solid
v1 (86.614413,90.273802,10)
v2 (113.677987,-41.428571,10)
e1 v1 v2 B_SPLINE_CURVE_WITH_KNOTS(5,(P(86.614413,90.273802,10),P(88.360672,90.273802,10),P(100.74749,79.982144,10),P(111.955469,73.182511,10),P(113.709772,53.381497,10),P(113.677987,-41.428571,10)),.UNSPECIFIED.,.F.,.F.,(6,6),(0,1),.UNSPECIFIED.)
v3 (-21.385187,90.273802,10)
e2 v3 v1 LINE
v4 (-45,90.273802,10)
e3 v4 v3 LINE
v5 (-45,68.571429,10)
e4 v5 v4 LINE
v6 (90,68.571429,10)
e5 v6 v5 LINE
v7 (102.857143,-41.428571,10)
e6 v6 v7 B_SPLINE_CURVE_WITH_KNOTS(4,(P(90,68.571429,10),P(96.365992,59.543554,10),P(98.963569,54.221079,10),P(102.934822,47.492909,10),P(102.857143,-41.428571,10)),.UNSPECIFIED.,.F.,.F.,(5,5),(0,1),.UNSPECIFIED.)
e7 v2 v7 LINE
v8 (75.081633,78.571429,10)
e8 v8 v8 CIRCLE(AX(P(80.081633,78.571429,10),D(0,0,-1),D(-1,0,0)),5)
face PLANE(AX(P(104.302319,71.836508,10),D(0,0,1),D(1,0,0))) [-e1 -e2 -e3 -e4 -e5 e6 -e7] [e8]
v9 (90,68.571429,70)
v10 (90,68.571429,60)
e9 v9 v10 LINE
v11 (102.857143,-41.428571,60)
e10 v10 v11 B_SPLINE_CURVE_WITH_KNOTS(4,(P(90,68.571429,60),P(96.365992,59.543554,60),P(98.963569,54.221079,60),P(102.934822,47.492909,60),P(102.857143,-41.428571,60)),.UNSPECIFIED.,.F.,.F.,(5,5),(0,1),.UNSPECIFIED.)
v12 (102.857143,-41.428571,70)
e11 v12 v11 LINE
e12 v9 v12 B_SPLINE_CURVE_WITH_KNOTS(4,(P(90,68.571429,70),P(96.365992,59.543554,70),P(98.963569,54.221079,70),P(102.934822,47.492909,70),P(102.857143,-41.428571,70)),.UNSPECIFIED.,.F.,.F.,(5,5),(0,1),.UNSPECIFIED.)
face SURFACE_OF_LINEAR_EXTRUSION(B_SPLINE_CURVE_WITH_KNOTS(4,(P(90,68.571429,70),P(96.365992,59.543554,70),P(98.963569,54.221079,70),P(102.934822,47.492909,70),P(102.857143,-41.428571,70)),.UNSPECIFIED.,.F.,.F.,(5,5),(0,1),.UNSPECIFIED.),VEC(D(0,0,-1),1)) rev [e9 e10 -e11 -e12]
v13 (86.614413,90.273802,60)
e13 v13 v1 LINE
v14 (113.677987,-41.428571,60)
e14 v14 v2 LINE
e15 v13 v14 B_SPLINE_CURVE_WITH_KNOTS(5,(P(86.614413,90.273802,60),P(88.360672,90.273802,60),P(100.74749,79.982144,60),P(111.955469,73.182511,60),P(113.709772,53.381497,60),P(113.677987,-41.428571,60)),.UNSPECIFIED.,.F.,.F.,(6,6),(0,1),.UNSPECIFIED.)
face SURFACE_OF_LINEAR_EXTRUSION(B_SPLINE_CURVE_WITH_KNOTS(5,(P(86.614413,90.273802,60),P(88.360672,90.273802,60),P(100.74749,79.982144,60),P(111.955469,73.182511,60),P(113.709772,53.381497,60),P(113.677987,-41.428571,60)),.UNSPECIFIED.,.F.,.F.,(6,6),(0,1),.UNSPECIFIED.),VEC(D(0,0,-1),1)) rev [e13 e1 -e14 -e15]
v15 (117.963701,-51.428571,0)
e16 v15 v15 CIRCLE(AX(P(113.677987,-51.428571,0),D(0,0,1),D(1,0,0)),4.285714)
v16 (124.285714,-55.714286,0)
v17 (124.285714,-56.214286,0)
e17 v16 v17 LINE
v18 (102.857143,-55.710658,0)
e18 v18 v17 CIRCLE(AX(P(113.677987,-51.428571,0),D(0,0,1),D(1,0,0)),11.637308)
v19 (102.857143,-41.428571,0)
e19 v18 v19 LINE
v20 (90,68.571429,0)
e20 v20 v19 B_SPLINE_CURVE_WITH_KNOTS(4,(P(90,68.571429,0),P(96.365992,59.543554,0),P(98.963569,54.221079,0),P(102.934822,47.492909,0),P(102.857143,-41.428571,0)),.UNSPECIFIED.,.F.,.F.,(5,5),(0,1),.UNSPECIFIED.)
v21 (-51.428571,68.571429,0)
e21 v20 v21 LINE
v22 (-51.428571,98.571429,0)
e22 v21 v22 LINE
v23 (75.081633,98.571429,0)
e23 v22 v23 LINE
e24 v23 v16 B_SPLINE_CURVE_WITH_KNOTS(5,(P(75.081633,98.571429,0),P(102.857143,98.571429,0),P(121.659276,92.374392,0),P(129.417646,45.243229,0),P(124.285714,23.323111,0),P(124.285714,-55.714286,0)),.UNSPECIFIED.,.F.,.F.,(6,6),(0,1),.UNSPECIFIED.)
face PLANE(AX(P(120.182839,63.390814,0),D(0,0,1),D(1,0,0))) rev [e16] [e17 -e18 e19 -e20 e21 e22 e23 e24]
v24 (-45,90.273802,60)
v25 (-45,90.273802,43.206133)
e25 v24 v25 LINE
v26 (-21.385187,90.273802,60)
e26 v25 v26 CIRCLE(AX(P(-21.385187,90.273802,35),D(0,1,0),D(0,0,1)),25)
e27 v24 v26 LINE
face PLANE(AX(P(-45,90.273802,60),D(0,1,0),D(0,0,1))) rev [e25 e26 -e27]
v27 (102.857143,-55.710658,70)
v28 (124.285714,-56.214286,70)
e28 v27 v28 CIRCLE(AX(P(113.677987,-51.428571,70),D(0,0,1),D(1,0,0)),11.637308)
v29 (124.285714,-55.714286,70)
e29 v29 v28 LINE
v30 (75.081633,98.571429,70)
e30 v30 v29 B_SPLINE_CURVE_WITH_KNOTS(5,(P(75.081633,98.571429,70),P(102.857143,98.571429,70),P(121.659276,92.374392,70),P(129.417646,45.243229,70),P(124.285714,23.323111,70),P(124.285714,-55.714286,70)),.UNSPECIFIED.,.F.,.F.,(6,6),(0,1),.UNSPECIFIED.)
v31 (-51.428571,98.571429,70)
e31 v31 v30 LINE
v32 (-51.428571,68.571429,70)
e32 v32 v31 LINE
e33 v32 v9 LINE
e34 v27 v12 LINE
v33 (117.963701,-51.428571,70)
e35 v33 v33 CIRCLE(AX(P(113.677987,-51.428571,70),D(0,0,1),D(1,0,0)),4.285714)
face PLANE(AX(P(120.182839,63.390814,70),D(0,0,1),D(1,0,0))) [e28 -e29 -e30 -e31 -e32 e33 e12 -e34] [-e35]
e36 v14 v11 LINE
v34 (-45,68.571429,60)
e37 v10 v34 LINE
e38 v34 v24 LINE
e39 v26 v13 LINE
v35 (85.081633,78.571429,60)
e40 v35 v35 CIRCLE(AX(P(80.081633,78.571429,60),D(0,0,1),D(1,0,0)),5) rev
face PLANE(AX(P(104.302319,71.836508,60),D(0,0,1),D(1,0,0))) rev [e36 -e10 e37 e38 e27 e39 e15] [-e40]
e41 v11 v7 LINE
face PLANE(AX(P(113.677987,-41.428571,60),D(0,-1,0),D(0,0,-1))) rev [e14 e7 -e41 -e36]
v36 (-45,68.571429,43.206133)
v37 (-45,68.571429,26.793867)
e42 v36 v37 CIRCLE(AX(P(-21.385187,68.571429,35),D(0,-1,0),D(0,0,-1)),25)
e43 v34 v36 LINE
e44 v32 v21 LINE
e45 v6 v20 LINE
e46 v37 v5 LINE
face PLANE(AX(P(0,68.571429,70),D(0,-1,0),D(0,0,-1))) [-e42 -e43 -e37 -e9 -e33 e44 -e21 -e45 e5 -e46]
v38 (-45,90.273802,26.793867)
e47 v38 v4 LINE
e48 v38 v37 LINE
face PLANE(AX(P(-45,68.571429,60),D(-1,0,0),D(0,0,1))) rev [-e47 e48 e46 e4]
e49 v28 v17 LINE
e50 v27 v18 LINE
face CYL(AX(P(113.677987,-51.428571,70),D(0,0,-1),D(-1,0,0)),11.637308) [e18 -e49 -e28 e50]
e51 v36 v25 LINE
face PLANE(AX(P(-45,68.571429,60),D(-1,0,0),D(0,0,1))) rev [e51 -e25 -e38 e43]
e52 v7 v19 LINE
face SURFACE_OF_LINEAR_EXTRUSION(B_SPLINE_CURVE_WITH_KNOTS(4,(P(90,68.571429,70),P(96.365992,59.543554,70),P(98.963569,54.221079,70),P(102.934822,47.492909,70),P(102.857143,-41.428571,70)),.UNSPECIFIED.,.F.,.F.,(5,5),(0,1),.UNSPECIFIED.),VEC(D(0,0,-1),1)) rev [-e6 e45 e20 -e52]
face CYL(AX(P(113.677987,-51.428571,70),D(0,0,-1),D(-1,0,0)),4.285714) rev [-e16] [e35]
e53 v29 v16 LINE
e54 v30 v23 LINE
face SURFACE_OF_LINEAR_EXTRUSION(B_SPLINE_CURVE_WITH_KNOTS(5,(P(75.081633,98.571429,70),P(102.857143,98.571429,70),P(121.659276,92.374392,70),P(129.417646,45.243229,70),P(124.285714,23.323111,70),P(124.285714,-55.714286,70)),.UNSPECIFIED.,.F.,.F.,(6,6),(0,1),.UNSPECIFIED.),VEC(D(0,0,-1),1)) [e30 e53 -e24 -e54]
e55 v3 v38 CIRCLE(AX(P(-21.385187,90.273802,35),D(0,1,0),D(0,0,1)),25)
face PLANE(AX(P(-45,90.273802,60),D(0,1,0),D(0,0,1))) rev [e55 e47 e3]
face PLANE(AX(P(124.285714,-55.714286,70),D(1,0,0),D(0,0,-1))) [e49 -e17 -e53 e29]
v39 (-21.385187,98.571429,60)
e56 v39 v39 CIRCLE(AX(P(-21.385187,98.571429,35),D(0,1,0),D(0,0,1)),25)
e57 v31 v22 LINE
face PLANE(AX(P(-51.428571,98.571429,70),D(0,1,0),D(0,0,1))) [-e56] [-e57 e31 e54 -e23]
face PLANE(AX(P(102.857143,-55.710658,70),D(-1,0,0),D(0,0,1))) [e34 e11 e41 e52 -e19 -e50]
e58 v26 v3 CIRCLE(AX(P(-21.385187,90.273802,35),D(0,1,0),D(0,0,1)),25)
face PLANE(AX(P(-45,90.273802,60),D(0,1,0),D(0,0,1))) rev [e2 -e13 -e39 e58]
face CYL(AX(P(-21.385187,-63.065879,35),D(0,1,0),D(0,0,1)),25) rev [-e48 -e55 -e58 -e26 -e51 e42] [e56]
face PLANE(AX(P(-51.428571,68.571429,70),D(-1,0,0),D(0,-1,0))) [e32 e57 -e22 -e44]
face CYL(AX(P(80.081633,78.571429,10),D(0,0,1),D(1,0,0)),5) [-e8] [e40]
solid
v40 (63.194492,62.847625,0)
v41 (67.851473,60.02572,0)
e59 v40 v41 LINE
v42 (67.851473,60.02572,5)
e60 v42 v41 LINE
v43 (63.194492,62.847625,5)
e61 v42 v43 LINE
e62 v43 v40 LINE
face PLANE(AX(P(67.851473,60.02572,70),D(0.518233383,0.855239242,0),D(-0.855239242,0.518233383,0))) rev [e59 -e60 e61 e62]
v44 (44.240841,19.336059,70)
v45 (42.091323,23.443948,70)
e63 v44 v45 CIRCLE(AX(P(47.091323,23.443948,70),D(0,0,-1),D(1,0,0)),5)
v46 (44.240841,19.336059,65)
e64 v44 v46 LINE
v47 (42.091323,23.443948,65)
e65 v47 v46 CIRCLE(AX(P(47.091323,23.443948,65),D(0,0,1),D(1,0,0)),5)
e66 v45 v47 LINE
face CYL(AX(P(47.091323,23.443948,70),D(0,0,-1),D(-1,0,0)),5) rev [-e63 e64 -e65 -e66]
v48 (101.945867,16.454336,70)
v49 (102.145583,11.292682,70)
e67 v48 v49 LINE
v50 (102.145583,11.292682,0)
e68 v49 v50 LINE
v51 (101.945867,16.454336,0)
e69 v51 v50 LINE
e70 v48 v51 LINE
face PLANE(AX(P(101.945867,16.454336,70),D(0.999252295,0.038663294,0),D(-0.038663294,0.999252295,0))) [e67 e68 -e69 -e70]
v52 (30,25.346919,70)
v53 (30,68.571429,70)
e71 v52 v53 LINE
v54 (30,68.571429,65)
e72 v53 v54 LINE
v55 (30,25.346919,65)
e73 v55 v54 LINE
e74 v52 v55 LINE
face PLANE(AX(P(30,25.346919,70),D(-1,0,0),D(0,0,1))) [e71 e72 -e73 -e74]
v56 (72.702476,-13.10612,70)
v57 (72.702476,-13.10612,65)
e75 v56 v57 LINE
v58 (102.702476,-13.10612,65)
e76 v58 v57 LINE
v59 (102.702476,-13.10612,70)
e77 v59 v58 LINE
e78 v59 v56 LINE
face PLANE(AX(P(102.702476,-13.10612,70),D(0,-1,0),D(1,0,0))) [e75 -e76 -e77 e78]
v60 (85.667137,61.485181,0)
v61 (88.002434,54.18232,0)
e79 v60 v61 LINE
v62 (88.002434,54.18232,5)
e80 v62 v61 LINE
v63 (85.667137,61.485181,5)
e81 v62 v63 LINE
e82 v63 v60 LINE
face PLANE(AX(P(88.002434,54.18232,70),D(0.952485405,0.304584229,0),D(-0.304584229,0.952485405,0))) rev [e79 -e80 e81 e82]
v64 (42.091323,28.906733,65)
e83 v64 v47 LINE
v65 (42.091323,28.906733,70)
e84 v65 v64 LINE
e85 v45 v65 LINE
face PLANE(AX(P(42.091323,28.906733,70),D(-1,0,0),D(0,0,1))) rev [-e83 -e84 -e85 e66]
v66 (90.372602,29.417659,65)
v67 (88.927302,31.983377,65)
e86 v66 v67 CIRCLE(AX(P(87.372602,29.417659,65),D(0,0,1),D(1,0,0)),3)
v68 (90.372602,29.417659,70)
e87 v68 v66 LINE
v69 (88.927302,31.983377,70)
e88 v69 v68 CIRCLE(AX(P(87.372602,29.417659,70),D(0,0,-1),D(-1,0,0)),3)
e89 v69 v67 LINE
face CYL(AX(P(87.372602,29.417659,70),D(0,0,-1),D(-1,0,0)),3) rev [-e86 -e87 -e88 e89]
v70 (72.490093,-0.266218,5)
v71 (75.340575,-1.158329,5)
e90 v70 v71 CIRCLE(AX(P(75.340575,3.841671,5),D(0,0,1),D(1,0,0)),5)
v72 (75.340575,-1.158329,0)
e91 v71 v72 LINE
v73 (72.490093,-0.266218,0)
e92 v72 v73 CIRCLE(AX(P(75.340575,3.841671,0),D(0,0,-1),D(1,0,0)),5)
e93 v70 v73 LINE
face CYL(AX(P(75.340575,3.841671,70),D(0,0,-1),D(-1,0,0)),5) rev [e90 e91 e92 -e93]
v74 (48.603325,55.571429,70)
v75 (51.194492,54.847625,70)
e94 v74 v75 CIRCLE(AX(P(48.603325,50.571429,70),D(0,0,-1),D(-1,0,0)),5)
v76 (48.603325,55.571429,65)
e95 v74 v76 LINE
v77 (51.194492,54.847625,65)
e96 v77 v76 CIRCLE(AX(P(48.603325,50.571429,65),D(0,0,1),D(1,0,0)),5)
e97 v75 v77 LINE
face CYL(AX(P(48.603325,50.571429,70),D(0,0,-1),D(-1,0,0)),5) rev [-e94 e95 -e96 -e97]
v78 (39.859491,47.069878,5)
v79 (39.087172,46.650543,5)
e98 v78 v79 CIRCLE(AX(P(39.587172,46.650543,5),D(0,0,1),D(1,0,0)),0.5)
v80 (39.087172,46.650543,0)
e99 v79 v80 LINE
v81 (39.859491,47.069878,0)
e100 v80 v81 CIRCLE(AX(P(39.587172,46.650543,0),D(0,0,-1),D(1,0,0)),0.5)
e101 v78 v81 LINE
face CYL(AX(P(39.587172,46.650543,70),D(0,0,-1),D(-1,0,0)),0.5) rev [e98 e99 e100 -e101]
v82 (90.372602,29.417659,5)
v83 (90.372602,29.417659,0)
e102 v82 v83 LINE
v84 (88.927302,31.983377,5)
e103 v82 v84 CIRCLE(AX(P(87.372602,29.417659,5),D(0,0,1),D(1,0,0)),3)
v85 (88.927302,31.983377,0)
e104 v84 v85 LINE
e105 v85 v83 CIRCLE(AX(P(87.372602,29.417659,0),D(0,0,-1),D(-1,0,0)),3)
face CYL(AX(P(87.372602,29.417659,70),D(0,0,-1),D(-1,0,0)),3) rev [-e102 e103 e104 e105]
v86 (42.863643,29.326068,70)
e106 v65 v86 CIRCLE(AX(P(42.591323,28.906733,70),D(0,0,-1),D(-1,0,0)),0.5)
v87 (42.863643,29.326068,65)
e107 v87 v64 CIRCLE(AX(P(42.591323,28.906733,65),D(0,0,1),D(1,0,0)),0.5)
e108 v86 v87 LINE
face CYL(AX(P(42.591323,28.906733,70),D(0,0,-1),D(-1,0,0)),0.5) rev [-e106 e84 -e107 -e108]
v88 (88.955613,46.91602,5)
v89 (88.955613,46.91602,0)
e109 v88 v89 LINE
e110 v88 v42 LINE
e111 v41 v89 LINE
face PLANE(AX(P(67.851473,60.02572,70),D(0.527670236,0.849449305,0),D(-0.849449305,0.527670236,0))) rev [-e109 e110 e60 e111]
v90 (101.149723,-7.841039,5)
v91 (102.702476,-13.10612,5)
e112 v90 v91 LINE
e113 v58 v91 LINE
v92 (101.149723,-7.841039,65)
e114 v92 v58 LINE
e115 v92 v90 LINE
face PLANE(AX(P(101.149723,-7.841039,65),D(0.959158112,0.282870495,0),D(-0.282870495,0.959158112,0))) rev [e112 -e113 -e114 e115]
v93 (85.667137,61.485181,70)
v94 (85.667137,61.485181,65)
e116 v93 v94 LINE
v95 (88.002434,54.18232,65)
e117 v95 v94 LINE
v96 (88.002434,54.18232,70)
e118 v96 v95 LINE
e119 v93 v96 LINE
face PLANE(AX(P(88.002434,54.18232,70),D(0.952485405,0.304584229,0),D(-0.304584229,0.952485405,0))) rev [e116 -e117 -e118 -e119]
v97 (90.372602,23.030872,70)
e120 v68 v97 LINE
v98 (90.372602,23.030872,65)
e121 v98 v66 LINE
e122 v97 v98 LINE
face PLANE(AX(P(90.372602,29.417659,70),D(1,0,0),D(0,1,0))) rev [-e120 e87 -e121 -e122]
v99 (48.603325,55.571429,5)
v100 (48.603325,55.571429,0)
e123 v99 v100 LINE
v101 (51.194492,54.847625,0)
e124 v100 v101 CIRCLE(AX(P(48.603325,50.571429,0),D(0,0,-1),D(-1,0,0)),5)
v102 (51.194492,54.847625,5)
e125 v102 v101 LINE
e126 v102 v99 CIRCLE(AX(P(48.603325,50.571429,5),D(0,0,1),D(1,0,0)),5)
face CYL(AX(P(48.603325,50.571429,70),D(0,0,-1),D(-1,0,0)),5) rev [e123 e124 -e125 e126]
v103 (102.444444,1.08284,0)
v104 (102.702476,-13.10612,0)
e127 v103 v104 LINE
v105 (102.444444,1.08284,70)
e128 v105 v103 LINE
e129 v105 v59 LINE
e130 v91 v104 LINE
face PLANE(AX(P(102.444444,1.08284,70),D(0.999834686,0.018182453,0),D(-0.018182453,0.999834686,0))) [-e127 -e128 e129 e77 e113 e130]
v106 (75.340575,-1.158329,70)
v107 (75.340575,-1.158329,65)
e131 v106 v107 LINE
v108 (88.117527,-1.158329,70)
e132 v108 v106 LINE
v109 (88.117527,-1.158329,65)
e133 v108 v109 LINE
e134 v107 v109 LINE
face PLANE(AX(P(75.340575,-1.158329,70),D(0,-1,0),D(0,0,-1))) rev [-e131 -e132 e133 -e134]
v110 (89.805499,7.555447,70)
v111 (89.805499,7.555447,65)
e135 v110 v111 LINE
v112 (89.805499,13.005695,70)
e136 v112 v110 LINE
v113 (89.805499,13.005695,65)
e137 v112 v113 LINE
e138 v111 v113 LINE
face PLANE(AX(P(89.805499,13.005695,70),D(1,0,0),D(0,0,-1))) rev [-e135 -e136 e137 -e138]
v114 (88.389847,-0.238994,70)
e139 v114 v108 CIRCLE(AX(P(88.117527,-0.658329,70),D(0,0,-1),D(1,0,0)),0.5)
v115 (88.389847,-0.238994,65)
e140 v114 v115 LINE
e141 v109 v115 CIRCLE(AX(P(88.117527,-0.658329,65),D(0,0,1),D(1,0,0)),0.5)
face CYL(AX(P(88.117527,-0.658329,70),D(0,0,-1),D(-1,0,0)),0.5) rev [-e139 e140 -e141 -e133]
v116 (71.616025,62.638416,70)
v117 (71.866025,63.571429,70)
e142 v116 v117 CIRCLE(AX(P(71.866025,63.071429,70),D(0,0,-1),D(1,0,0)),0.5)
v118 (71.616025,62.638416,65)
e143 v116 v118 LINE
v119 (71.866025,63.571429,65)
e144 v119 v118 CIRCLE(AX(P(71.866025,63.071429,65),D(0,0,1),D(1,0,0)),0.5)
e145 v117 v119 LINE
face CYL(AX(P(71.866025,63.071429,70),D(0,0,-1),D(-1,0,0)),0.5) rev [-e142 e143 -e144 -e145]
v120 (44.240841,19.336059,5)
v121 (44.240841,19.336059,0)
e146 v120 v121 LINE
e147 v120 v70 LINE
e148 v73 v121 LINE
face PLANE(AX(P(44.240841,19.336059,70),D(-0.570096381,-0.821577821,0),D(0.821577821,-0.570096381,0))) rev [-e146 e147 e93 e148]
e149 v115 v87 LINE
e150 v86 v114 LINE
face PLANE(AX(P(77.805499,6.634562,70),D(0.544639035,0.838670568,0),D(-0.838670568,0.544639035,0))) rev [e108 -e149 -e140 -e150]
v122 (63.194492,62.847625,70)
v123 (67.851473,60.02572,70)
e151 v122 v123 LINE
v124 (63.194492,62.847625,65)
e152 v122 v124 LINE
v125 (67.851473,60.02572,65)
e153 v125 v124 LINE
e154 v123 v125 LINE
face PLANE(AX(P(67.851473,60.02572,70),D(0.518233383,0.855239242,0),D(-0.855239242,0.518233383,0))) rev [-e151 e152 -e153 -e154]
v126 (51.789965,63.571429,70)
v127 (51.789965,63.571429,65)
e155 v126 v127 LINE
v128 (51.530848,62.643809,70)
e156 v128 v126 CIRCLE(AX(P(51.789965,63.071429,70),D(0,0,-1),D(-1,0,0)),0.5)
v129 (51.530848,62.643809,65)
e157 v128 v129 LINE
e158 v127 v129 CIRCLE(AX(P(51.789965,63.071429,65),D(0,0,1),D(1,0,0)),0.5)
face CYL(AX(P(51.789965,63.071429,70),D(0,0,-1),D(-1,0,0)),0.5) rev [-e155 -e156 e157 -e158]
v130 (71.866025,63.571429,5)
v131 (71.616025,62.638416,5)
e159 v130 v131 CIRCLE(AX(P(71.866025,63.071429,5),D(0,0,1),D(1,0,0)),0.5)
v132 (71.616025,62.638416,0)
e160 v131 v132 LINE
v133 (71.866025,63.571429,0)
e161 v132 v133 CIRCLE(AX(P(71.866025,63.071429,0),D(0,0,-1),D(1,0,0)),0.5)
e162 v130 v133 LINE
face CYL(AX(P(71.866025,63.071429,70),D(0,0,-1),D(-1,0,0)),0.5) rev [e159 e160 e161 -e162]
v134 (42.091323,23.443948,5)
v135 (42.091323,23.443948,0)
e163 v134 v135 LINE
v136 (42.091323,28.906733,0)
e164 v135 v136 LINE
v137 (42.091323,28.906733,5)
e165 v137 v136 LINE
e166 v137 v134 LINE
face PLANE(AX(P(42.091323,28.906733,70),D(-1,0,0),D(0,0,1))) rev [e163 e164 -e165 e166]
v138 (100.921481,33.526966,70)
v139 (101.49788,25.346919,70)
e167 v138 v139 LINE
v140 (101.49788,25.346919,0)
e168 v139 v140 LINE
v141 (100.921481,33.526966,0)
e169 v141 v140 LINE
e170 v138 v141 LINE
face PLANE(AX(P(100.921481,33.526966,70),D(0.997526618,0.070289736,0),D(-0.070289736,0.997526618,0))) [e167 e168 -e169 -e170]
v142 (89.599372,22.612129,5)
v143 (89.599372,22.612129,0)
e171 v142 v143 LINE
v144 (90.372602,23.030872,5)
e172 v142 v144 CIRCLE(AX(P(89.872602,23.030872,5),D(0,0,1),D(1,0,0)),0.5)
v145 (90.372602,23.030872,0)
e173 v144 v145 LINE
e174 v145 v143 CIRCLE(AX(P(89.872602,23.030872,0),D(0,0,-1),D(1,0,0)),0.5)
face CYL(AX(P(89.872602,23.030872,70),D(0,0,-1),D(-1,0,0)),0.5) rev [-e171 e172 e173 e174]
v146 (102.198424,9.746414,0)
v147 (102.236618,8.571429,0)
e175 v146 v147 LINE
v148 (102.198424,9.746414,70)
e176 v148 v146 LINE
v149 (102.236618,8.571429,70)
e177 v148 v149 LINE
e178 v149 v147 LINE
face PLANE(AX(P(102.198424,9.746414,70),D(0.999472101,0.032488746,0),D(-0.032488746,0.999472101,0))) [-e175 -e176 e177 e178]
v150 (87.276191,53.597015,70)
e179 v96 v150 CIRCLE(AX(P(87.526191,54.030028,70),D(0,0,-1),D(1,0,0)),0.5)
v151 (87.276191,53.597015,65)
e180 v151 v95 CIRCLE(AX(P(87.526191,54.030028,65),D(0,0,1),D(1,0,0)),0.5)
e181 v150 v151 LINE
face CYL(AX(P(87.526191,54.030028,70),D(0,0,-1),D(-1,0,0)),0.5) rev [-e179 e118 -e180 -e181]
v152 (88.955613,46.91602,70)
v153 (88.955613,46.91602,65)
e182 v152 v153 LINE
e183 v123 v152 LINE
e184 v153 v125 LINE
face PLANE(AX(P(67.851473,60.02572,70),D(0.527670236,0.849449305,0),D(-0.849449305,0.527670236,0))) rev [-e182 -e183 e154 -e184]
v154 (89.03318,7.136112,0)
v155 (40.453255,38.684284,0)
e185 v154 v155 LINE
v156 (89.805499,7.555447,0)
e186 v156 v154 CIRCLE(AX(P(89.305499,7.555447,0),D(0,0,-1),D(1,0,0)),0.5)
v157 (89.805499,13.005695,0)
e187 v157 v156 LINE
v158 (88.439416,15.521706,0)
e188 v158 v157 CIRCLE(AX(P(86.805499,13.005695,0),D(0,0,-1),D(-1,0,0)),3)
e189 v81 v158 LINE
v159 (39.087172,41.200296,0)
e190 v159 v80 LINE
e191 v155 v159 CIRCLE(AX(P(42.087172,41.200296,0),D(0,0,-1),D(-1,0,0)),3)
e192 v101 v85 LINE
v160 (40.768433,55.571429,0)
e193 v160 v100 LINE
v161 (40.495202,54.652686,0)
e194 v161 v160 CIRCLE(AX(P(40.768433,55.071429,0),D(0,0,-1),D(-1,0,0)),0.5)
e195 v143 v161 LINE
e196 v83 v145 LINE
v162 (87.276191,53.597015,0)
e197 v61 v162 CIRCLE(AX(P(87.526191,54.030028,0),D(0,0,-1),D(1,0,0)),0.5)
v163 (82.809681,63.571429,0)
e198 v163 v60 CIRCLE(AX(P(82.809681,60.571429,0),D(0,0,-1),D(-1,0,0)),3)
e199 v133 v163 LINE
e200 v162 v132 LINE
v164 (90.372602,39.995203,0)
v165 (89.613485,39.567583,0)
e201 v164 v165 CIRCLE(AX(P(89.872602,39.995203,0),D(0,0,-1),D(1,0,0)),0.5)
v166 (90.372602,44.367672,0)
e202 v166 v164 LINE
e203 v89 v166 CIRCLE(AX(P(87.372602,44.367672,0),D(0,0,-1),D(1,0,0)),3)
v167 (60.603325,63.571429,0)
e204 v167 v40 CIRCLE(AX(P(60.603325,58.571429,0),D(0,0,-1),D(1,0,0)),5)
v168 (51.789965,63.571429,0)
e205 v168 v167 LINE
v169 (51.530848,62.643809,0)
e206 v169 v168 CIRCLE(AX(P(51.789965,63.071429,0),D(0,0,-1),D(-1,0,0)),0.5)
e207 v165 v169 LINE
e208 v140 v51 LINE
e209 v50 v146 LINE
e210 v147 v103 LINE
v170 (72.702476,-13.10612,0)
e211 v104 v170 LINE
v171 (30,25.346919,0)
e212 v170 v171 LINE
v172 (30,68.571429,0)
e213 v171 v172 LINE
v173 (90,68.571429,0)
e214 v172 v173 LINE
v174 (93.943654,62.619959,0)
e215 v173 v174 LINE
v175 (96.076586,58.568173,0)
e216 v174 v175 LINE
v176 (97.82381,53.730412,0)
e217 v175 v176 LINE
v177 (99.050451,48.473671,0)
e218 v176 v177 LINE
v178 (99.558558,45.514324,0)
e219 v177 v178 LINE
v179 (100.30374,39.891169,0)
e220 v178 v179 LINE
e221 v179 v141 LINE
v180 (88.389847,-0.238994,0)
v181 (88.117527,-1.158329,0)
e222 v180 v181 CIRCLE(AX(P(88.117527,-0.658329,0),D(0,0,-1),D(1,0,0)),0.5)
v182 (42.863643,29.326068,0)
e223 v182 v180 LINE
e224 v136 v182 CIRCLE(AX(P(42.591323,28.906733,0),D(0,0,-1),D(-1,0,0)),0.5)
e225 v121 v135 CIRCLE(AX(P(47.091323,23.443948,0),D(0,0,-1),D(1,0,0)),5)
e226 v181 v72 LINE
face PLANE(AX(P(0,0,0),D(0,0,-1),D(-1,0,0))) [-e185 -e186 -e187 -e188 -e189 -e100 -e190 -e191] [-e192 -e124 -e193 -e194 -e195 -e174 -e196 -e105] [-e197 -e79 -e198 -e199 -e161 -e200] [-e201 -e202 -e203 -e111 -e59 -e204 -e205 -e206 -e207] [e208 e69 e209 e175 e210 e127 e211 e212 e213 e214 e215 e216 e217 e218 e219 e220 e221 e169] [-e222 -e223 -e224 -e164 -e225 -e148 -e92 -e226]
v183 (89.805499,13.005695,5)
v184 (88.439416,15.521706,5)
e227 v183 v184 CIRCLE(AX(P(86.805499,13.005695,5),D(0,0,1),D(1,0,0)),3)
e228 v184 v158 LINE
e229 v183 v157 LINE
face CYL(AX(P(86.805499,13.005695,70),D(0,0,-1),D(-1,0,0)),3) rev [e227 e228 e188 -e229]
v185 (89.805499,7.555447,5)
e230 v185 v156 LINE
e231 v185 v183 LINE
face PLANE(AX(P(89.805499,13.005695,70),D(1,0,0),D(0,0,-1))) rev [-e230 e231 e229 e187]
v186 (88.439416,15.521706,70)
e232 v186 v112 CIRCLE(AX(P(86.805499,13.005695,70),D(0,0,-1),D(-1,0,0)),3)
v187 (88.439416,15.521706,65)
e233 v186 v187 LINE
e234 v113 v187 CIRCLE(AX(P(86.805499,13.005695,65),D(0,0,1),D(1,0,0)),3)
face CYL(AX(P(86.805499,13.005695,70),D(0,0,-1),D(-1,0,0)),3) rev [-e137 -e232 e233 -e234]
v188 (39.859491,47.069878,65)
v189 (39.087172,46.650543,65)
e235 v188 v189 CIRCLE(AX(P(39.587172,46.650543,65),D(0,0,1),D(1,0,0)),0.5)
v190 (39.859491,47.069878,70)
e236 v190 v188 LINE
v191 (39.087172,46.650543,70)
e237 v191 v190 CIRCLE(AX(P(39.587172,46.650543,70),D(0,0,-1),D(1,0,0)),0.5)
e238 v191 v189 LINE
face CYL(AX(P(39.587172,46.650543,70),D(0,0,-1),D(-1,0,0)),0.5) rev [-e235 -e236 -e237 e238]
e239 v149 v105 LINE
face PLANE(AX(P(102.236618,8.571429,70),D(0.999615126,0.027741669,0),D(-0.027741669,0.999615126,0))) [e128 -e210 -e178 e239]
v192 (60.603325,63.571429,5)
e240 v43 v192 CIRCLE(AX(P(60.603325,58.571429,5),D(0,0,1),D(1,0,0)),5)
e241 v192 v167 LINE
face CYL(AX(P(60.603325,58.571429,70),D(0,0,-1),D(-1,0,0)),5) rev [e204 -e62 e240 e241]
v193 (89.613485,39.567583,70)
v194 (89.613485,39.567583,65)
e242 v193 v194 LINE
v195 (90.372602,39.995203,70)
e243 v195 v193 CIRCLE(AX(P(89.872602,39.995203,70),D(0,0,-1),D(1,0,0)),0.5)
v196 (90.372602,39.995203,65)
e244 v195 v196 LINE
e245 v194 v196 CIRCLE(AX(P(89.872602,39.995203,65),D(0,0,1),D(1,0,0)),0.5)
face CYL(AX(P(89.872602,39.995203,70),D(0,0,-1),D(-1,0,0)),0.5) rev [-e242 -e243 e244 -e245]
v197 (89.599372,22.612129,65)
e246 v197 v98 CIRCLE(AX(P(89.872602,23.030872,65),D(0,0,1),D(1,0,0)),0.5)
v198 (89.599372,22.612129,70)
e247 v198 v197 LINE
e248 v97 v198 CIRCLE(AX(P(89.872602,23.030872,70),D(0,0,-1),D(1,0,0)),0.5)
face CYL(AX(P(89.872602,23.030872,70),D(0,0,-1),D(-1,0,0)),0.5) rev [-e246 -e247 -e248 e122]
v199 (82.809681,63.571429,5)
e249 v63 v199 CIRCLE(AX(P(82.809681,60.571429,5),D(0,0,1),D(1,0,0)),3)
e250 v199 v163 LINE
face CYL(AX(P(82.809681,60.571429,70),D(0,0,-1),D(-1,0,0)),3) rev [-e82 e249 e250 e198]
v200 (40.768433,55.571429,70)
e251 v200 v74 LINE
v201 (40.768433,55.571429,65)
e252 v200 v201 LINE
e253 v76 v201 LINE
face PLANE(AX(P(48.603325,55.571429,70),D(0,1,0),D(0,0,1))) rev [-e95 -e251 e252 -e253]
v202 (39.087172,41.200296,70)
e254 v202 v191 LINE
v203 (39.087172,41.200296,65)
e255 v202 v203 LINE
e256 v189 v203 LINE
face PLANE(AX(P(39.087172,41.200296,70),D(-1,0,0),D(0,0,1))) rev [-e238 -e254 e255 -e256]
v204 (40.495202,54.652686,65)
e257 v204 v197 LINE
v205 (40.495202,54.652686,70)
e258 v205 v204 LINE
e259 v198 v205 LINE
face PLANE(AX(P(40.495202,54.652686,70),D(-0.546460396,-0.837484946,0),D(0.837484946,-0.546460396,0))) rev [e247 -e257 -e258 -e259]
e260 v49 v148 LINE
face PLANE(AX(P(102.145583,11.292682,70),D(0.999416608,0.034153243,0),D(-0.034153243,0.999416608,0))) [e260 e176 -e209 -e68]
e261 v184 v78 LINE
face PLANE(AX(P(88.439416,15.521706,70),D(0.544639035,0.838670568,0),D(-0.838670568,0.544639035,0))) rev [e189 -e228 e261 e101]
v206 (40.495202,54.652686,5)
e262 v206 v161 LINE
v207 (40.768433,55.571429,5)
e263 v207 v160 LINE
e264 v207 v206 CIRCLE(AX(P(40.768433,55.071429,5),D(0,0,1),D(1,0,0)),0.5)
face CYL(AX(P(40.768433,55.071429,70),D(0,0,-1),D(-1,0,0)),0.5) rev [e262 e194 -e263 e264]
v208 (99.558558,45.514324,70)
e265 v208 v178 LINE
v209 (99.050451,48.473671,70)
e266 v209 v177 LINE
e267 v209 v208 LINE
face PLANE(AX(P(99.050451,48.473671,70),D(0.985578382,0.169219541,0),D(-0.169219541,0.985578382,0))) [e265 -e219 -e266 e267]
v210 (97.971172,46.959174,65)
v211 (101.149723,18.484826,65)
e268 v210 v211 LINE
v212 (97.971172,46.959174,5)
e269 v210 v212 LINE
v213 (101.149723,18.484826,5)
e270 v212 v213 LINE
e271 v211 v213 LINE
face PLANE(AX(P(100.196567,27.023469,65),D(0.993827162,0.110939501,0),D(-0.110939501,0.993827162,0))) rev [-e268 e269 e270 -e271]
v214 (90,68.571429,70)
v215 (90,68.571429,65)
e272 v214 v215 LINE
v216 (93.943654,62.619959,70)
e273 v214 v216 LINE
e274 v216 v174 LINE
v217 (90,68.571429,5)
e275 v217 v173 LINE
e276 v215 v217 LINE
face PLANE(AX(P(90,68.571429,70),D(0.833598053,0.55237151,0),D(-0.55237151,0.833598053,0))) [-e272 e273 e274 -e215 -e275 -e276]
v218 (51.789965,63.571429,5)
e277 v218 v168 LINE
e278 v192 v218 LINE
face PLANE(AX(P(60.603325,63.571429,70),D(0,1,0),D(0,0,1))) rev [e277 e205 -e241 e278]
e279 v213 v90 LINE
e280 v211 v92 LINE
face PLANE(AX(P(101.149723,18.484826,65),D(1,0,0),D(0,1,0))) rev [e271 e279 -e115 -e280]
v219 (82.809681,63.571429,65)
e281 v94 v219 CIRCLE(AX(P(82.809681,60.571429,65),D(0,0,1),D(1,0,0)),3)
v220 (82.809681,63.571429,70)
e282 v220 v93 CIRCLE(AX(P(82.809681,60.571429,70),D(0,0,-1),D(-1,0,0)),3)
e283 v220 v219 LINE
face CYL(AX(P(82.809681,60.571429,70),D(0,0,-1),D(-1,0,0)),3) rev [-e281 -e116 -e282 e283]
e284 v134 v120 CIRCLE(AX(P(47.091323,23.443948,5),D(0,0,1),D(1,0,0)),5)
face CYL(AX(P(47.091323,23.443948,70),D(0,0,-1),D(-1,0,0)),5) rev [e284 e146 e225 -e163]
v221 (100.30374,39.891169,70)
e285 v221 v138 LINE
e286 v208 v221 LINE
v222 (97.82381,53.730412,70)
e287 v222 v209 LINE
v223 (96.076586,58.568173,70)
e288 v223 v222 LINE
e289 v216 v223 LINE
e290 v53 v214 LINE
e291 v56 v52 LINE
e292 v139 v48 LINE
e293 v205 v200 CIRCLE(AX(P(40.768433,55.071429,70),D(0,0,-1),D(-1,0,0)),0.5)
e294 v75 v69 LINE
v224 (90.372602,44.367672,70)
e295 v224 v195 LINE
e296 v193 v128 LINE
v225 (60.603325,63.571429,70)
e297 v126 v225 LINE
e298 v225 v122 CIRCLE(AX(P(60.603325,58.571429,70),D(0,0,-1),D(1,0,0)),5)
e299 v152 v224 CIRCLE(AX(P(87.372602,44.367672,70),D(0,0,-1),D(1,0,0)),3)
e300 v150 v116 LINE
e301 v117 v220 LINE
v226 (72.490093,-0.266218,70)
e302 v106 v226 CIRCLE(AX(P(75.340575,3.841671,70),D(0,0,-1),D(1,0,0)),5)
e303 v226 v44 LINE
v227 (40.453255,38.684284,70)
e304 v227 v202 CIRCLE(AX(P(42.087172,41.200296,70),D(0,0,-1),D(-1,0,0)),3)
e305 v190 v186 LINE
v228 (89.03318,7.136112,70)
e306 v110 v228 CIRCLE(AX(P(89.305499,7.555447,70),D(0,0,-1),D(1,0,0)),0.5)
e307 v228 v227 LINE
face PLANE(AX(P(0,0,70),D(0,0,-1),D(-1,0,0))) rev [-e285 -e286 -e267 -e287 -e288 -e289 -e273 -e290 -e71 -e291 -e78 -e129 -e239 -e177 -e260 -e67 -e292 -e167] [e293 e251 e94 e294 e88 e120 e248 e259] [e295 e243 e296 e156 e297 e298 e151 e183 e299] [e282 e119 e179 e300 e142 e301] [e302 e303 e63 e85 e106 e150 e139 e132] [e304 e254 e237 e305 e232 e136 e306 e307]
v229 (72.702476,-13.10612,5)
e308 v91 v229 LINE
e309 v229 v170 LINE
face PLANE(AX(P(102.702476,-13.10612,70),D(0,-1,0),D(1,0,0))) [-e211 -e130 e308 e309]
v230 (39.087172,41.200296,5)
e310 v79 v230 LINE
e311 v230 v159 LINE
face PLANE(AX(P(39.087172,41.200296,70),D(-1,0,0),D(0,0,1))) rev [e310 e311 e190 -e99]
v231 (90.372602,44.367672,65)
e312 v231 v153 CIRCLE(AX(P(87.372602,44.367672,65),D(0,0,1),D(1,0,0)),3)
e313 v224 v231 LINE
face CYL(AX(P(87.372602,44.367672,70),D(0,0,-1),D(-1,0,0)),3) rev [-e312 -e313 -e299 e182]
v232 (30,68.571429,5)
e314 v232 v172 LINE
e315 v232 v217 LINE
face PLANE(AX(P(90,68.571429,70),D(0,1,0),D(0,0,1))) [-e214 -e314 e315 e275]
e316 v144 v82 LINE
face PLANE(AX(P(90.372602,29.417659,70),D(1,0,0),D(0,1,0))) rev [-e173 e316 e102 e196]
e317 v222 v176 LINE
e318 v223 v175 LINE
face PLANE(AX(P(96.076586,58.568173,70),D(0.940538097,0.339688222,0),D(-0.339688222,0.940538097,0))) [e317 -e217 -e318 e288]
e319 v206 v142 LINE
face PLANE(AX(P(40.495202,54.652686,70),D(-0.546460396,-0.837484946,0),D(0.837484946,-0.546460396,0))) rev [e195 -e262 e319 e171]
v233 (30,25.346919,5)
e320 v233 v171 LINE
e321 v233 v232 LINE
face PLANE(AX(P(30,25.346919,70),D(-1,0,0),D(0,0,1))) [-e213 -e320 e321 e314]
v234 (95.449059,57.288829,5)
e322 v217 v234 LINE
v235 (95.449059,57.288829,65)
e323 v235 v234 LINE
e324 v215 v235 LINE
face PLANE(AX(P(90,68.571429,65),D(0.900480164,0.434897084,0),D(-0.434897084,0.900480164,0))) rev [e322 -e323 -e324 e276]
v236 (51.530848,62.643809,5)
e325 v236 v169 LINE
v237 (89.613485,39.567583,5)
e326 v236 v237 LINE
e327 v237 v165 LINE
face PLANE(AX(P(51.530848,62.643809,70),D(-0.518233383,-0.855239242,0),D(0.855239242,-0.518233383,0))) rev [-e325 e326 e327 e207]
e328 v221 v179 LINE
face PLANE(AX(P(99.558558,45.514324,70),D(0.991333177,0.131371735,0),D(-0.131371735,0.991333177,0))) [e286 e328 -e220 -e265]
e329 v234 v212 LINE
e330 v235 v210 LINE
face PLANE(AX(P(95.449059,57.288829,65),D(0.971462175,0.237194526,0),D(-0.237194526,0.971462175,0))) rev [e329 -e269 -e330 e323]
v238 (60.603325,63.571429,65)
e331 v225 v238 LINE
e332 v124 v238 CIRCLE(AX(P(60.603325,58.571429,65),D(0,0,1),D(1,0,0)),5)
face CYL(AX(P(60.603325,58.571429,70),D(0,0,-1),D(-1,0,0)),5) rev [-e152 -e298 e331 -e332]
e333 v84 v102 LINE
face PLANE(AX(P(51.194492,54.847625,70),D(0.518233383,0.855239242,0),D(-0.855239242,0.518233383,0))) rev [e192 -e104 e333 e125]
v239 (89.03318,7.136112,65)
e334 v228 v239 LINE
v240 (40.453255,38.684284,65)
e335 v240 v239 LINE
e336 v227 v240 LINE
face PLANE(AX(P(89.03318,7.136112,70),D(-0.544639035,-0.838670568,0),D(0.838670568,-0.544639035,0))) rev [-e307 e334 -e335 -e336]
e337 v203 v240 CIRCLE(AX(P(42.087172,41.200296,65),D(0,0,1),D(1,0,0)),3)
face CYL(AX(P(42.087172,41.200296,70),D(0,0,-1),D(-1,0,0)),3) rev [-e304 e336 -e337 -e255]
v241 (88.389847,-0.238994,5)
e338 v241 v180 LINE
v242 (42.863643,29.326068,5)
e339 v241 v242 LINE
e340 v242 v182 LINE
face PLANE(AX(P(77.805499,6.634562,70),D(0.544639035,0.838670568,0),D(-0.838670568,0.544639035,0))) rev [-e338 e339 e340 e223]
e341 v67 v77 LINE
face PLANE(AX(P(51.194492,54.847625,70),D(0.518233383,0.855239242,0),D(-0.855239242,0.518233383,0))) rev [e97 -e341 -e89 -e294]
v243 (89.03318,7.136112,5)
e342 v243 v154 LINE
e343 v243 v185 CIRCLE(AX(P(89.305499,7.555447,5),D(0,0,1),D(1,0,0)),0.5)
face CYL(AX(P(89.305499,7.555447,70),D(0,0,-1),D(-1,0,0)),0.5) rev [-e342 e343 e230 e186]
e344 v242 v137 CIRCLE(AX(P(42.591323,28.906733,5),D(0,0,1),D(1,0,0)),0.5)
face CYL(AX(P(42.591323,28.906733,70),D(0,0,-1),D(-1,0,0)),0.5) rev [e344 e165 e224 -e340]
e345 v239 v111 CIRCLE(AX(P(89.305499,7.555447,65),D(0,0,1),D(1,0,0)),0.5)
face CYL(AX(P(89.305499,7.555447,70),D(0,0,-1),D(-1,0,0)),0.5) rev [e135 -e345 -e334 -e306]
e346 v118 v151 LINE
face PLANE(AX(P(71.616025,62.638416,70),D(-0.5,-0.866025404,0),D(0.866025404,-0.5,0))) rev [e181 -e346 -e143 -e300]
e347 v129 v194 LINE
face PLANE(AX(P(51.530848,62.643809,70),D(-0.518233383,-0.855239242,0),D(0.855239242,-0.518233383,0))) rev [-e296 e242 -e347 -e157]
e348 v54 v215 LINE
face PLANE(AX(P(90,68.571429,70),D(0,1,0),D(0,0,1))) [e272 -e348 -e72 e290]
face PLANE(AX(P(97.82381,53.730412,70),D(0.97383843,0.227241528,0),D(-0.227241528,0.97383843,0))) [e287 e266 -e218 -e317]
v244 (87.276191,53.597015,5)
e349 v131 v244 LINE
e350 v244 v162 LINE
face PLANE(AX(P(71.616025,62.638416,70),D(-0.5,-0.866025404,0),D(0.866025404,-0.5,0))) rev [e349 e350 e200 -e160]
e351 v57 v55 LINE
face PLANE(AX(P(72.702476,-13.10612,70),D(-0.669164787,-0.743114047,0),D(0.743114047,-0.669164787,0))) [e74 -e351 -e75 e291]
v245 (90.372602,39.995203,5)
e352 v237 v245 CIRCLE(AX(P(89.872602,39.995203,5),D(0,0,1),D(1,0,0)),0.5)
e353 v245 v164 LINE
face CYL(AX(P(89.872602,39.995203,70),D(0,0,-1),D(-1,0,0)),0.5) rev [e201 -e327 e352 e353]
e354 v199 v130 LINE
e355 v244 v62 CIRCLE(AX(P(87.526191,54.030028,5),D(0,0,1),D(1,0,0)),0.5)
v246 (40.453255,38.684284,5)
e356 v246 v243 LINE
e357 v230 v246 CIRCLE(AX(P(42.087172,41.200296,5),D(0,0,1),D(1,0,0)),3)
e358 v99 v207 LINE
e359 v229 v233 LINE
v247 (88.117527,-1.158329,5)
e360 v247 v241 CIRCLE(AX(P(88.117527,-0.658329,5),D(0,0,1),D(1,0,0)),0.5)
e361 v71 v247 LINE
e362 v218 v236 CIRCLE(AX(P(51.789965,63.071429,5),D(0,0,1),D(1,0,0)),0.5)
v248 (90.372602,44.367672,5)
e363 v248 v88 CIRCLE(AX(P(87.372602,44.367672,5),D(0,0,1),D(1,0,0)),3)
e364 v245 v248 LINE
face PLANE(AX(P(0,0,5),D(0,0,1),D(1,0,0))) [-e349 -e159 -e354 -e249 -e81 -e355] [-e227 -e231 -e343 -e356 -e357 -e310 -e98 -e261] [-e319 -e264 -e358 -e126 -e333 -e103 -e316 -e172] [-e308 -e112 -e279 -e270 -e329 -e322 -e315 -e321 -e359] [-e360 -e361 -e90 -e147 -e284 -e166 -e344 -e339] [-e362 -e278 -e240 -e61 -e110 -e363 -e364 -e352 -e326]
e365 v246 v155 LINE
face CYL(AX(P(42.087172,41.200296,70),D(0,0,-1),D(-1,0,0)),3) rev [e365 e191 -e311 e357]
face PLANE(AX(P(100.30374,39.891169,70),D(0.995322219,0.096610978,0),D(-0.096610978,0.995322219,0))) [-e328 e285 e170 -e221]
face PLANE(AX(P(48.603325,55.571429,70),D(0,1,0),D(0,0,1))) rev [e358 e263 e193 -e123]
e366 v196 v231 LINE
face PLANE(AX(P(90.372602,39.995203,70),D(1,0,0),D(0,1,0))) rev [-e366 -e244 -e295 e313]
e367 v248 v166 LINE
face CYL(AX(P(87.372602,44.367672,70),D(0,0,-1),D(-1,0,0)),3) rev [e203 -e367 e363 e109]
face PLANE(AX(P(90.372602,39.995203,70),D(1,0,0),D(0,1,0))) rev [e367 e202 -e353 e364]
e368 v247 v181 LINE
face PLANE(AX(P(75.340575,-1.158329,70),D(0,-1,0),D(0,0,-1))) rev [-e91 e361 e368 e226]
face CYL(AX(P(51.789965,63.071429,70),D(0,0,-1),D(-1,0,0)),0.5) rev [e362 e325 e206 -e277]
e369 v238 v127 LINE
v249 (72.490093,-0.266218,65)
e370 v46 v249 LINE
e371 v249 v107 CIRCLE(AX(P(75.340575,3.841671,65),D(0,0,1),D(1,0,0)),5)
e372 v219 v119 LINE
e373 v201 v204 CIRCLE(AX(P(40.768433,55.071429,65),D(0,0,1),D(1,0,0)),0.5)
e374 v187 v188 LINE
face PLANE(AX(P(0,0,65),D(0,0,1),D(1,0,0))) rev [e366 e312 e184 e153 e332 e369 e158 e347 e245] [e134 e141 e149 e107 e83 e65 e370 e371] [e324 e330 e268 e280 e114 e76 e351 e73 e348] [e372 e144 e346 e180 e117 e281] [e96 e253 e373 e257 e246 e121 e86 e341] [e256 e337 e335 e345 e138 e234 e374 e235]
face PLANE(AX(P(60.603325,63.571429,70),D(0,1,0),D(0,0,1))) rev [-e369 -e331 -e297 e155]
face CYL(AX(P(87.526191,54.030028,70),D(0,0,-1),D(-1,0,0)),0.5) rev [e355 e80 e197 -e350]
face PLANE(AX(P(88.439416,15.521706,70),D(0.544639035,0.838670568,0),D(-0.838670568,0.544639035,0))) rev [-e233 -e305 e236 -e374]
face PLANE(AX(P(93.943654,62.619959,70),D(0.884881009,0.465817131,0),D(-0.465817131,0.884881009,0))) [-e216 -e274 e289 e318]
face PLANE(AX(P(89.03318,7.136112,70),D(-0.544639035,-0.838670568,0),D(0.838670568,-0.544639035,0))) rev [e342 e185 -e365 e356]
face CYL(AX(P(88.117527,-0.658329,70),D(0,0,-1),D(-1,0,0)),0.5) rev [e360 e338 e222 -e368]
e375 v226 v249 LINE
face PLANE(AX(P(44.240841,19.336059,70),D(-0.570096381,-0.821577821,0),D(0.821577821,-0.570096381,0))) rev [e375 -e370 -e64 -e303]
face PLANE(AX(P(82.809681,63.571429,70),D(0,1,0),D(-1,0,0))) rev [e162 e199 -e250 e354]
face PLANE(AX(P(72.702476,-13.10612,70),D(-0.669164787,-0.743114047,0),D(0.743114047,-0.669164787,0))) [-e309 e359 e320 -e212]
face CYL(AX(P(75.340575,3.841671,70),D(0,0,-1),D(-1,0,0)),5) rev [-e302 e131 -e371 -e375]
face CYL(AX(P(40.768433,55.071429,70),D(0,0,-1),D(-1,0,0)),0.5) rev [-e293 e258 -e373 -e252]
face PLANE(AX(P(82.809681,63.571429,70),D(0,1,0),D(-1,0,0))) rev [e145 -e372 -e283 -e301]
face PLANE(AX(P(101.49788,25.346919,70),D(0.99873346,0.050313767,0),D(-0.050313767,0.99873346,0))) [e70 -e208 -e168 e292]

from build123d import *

# Parameters (mm, degrees)
EXTRUDE_4_OUTLINE_R = 4.285714286
EXTRUDE_4_DEPTH     = 70
CUT_EXTRUDE_START   = -25
CUT_EXTRUDE_2_DEPTH = 50
SKETCH_7_R          = 5
EXTRUDE_5_DEPTH     = 25
EXTRUDE_6_DEPTH     = 70
CUT_EXTRUDE_6_DEPTH = 30
CUT_EXTRUDE_7_DEPTH = 70
SKETCH_8_R          = 25
CUT_EXTRUDE_8_DEPTH = 217.032803357


# Read off the part's stored shape, not the designer's step: 凸台-拉伸4, 切除-拉伸2
with BuildPart() as part:
    # 凸台-拉伸4 outline → 凸台-拉伸4 (new body)
    with BuildSketch(Plane.XY):
        with BuildLine():
            add(Edge.make_bspline(
                [(75.081633224, 98.571428571), (102.857142857, 98.571428571), (121.659276484, 92.374392302), (129.417645806, 45.243229107), (124.285714286, 23.323110609), (124.285714286, -55.714285714)],
                knots=[0, 0, 0, 0, 0, 0, 1, 1, 1, 1, 1, 1], degree=5))
            Line((75.081633224, 98.571428571), (-51.428571429, 98.571428571))
            Line((-51.428571429, 98.571428571), (-51.428571429, 68.571428571))
            Line((-51.428571429, 68.571428571), (90, 68.571428571))
            add(Edge.make_bspline(
                [(90, 68.571428571), (96.36599167, 59.54355384), (98.963568623, 54.221078955), (102.934822038, 47.492908651), (102.857142857, -41.428571429)],
                knots=[0, 0, 0, 0, 0, 1, 1, 1, 1, 1], degree=4))
            Line((102.857142857, -41.428571429), (102.857142857, -55.710657963))
            ThreePointArc((102.857142857, -55.710657963), (113.404555332, -63.062666636), (124.285714286, -56.214285714))
            Line((124.285714286, -56.214285714), (124.285714286, -55.714285714))
        make_face()
        with Locations((113.677987148, -51.428571429)):
            Circle(EXTRUDE_4_OUTLINE_R, mode=Mode.SUBTRACT)
    extrude(amount=EXTRUDE_4_DEPTH)

    # 切除-拉伸2 outline → 切除-拉伸2 (cut)
    with BuildSketch(Plane(origin=(0, 0, 35), x_dir=(-1, 0, 0), z_dir=(0, 0, -1)).offset(CUT_EXTRUDE_START)):
        with BuildLine():
            Line((45, 90.273802118), (-86.614413472, 90.273802118))
            add(Edge.make_bspline(
                [(-86.614413472, 90.273802118), (-88.360672067, 90.273802118), (-100.747489611, 79.982143538), (-111.955468631, 73.182510666), (-113.70977154, 53.381496527), (-113.677987148, -41.428571429)],
                knots=[0, 0, 0, 0, 0, 0, 1, 1, 1, 1, 1, 1], degree=5))
            Line((-113.677987148, -41.428571429), (-102.857142857, -41.428571429))
            add(Edge.make_bspline(
                [(-90, 68.571428571), (-96.36599167, 59.54355384), (-98.963568623, 54.221078955), (-102.934822038, 47.492908651), (-102.857142857, -41.428571429)],
                knots=[0, 0, 0, 0, 0, 1, 1, 1, 1, 1], degree=4))
            Line((-90, 68.571428571), (45, 68.571428571))
            Line((45, 68.571428571), (45, 90.273802118))
        make_face()
    extrude(amount=CUT_EXTRUDE_2_DEPTH, mode=Mode.SUBTRACT)

    # 草图7 → 凸台-拉伸5 (add, symmetric)
    with BuildSketch(Plane(origin=(0, 0, 35), x_dir=(-1, 0, 0), z_dir=(0, 0, -1))):
        with Locations(Location((-80.081633224, 78.571428571, 0), (0, 0, 180))):
            Circle(SKETCH_7_R)
    extrude(amount=EXTRUDE_5_DEPTH, both=True)

    # 草图8 → 切除-拉伸8 (cut, through all)
    with BuildSketch(Plane(origin=(0, 98.571428571, 0), x_dir=(1, 0, 0), z_dir=(0, 1, 0))):
        with Locations(Location((-21.385187258, -35, 0), (0, 0, 270))):
            Circle(SKETCH_8_R)
    extrude(amount=-CUT_EXTRUDE_8_DEPTH, mode=Mode.SUBTRACT)


with BuildPart() as body_2:
    # 草图9 → 凸台-拉伸6 (new body)
    with BuildSketch(Plane(origin=(0, 0, 0), x_dir=(-1, 0, 0), z_dir=(0, 0, -1))):
        Polygon((-90, 68.571428571), (-30, 68.571428571), (-30, 25.346918923), (-72.702476388, -13.106120193), (-102.702476388, -13.106120193), (-102.44444362, 1.082840235), (-102.236617695, 8.571428571), (-102.198423739, 9.746413711), (-102.145582847, 11.292681667), (-101.945866973, 16.454335633), (-101.497880218, 25.346918923), (-100.921481237, 33.526965652), (-100.303739645, 39.891169232), (-99.558557747, 45.514323537), (-99.05045056, 48.473671229), (-97.823809945, 53.730411853), (-96.076586146, 58.568173195), (-93.943653788, 62.619959209), align=None)
    extrude(amount=-EXTRUDE_6_DEPTH)

    # 草图11 → 切除-拉伸6 (cut, symmetric)
    with BuildSketch(Plane(origin=(0, 0, 35), x_dir=(-1, 0, 0), z_dir=(0, 0, -1))):
        Polygon((-30, 68.571428571), (-30, 25.346918923), (-72.702476388, -13.106120193), (-102.702476388, -13.106120193), (-101.149723015, -7.841039459), (-101.149723015, 18.484825681), (-100.196566525, 27.023468843), (-97.971172378, 46.959173747), (-95.449059012, 57.288829242), (-90, 68.571428571), align=None)
    extrude(amount=CUT_EXTRUDE_6_DEPTH, both=True, mode=Mode.SUBTRACT)

    # 草图12 → 切除-拉伸7 (cut)
    with BuildSketch(Plane(origin=(0, 0, 0), x_dir=(-1, 0, 0), z_dir=(0, 0, -1))):
        with BuildLine():
            Line((-82.809680545, 63.571428571), (-71.866025404, 63.571428571))
            ThreePointArc((-71.866025404, 63.571428571), (-71.383062491, 63.200838094), (-71.616025404, 62.63841587))
            Line((-71.616025404, 62.63841587), (-87.276191195, 53.597014935))
            ThreePointArc((-87.276191195, 53.597014935), (-87.839945672, 53.640722964), (-88.002433897, 54.182319751))
            Line((-88.002433897, 54.182319751), (-85.667136762, 61.485181257))
            ThreePointArc((-85.667136762, 61.485181257), (-84.578683364, 62.99436667), (-82.809680545, 63.571428571))
        make_face()
        with BuildLine():
            Line((-67.851473283, 60.025720365), (-63.194491567, 62.847624779))
            ThreePointArc((-63.194491567, 62.847624779), (-61.948504742, 63.387079153), (-60.60332465, 63.571428571))
            Line((-60.60332465, 63.571428571), (-51.789965005, 63.571428571))
            ThreePointArc((-51.789965005, 63.571428571), (-51.308399947, 63.205946581), (-51.530848314, 62.643808951))
            Line((-51.530848314, 62.643808951), (-89.613485287, 39.567583206))
            ThreePointArc((-89.613485287, 39.567583206), (-90.118001301, 39.559566312), (-90.372601979, 39.995202827))
            Line((-90.372601979, 39.995202827), (-90.372601979, 44.367671677))
            ThreePointArc((-90.372601979, 44.367671677), (-89.994531814, 45.825575631), (-88.955612686, 46.916019592))
            Line((-88.955612686, 46.916019592), (-67.851473283, 60.025720365))
        make_face()
        with BuildLine():
            Line((-48.60332465, 55.571428571), (-40.768432632, 55.571428571))
            ThreePointArc((-40.768432632, 55.571428571), (-40.289177357, 55.213957101), (-40.495202434, 54.652686098))
            Line((-40.495202434, 54.652686098), (-89.599371781, 22.612129473))
            ThreePointArc((-89.599371781, 22.612129473), (-90.110703744, 22.591204402), (-90.372601979, 23.030871946))
            Line((-90.372601979, 23.030871946), (-90.372601979, 29.4176591))
            ThreePointArc((-90.372601979, 29.4176591), (-89.986421067, 30.890055031), (-88.927302129, 31.983376825))
            Line((-88.927302129, 31.983376825), (-51.194491567, 54.847624779))
            ThreePointArc((-51.194491567, 54.847624779), (-49.948504742, 55.387079153), (-48.60332465, 55.571428571))
        make_face()
        with BuildLine():
            Line((-89.805499039, 13.005694634), (-89.805499039, 7.555447176))
            ThreePointArc((-89.805499039, 7.555447176), (-89.544078419, 7.11603862), (-89.033179522, 7.136111892))
            Line((-89.033179522, 7.136111892), (-40.453254672, 38.684283967))
            ThreePointArc((-40.453254672, 38.684283967), (-39.450720439, 39.76881939), (-39.087171777, 41.20029567))
            Line((-39.087171777, 41.20029567), (-39.087171777, 46.650543128))
            ThreePointArc((-39.087171777, 46.650543128), (-39.348592397, 47.089951685), (-39.859491294, 47.069878412))
            Line((-39.859491294, 47.069878412), (-88.439416144, 15.521706338))
            ThreePointArc((-88.439416144, 15.521706338), (-89.441950377, 14.437170915), (-89.805499039, 13.005694634))
        make_face()
        with BuildLine():
            Line((-77.805499039, 6.634561733), (-42.863642809, 29.32606849))
            ThreePointArc((-42.863642809, 29.32606849), (-42.352743911, 29.346141762), (-42.091323291, 28.906733206))
            Line((-42.091323291, 28.906733206), (-42.091323291, 23.443947911))
            ThreePointArc((-42.091323291, 23.443947911), (-42.661176029, 21.125803127), (-44.240841386, 19.336058805))
            Line((-44.240841386, 19.336058805), (-72.490093284, -0.266218492))
            ThreePointArc((-72.490093284, -0.266218492), (-73.847163915, -0.930092452), (-75.340575189, -1.158329385))
            Line((-75.340575189, -1.158329385), (-88.117527328, -1.158329385))
            ThreePointArc((-88.117527328, -1.158329385), (-88.596937195, -0.800337058), (-88.389846845, -0.238994101))
            Line((-88.389846845, -0.238994101), (-77.805499039, 6.634561733))
        make_face()
    extrude(amount=-CUT_EXTRUDE_7_DEPTH, mode=Mode.SUBTRACT)


solid = Compound([part.part, body_2.part])
